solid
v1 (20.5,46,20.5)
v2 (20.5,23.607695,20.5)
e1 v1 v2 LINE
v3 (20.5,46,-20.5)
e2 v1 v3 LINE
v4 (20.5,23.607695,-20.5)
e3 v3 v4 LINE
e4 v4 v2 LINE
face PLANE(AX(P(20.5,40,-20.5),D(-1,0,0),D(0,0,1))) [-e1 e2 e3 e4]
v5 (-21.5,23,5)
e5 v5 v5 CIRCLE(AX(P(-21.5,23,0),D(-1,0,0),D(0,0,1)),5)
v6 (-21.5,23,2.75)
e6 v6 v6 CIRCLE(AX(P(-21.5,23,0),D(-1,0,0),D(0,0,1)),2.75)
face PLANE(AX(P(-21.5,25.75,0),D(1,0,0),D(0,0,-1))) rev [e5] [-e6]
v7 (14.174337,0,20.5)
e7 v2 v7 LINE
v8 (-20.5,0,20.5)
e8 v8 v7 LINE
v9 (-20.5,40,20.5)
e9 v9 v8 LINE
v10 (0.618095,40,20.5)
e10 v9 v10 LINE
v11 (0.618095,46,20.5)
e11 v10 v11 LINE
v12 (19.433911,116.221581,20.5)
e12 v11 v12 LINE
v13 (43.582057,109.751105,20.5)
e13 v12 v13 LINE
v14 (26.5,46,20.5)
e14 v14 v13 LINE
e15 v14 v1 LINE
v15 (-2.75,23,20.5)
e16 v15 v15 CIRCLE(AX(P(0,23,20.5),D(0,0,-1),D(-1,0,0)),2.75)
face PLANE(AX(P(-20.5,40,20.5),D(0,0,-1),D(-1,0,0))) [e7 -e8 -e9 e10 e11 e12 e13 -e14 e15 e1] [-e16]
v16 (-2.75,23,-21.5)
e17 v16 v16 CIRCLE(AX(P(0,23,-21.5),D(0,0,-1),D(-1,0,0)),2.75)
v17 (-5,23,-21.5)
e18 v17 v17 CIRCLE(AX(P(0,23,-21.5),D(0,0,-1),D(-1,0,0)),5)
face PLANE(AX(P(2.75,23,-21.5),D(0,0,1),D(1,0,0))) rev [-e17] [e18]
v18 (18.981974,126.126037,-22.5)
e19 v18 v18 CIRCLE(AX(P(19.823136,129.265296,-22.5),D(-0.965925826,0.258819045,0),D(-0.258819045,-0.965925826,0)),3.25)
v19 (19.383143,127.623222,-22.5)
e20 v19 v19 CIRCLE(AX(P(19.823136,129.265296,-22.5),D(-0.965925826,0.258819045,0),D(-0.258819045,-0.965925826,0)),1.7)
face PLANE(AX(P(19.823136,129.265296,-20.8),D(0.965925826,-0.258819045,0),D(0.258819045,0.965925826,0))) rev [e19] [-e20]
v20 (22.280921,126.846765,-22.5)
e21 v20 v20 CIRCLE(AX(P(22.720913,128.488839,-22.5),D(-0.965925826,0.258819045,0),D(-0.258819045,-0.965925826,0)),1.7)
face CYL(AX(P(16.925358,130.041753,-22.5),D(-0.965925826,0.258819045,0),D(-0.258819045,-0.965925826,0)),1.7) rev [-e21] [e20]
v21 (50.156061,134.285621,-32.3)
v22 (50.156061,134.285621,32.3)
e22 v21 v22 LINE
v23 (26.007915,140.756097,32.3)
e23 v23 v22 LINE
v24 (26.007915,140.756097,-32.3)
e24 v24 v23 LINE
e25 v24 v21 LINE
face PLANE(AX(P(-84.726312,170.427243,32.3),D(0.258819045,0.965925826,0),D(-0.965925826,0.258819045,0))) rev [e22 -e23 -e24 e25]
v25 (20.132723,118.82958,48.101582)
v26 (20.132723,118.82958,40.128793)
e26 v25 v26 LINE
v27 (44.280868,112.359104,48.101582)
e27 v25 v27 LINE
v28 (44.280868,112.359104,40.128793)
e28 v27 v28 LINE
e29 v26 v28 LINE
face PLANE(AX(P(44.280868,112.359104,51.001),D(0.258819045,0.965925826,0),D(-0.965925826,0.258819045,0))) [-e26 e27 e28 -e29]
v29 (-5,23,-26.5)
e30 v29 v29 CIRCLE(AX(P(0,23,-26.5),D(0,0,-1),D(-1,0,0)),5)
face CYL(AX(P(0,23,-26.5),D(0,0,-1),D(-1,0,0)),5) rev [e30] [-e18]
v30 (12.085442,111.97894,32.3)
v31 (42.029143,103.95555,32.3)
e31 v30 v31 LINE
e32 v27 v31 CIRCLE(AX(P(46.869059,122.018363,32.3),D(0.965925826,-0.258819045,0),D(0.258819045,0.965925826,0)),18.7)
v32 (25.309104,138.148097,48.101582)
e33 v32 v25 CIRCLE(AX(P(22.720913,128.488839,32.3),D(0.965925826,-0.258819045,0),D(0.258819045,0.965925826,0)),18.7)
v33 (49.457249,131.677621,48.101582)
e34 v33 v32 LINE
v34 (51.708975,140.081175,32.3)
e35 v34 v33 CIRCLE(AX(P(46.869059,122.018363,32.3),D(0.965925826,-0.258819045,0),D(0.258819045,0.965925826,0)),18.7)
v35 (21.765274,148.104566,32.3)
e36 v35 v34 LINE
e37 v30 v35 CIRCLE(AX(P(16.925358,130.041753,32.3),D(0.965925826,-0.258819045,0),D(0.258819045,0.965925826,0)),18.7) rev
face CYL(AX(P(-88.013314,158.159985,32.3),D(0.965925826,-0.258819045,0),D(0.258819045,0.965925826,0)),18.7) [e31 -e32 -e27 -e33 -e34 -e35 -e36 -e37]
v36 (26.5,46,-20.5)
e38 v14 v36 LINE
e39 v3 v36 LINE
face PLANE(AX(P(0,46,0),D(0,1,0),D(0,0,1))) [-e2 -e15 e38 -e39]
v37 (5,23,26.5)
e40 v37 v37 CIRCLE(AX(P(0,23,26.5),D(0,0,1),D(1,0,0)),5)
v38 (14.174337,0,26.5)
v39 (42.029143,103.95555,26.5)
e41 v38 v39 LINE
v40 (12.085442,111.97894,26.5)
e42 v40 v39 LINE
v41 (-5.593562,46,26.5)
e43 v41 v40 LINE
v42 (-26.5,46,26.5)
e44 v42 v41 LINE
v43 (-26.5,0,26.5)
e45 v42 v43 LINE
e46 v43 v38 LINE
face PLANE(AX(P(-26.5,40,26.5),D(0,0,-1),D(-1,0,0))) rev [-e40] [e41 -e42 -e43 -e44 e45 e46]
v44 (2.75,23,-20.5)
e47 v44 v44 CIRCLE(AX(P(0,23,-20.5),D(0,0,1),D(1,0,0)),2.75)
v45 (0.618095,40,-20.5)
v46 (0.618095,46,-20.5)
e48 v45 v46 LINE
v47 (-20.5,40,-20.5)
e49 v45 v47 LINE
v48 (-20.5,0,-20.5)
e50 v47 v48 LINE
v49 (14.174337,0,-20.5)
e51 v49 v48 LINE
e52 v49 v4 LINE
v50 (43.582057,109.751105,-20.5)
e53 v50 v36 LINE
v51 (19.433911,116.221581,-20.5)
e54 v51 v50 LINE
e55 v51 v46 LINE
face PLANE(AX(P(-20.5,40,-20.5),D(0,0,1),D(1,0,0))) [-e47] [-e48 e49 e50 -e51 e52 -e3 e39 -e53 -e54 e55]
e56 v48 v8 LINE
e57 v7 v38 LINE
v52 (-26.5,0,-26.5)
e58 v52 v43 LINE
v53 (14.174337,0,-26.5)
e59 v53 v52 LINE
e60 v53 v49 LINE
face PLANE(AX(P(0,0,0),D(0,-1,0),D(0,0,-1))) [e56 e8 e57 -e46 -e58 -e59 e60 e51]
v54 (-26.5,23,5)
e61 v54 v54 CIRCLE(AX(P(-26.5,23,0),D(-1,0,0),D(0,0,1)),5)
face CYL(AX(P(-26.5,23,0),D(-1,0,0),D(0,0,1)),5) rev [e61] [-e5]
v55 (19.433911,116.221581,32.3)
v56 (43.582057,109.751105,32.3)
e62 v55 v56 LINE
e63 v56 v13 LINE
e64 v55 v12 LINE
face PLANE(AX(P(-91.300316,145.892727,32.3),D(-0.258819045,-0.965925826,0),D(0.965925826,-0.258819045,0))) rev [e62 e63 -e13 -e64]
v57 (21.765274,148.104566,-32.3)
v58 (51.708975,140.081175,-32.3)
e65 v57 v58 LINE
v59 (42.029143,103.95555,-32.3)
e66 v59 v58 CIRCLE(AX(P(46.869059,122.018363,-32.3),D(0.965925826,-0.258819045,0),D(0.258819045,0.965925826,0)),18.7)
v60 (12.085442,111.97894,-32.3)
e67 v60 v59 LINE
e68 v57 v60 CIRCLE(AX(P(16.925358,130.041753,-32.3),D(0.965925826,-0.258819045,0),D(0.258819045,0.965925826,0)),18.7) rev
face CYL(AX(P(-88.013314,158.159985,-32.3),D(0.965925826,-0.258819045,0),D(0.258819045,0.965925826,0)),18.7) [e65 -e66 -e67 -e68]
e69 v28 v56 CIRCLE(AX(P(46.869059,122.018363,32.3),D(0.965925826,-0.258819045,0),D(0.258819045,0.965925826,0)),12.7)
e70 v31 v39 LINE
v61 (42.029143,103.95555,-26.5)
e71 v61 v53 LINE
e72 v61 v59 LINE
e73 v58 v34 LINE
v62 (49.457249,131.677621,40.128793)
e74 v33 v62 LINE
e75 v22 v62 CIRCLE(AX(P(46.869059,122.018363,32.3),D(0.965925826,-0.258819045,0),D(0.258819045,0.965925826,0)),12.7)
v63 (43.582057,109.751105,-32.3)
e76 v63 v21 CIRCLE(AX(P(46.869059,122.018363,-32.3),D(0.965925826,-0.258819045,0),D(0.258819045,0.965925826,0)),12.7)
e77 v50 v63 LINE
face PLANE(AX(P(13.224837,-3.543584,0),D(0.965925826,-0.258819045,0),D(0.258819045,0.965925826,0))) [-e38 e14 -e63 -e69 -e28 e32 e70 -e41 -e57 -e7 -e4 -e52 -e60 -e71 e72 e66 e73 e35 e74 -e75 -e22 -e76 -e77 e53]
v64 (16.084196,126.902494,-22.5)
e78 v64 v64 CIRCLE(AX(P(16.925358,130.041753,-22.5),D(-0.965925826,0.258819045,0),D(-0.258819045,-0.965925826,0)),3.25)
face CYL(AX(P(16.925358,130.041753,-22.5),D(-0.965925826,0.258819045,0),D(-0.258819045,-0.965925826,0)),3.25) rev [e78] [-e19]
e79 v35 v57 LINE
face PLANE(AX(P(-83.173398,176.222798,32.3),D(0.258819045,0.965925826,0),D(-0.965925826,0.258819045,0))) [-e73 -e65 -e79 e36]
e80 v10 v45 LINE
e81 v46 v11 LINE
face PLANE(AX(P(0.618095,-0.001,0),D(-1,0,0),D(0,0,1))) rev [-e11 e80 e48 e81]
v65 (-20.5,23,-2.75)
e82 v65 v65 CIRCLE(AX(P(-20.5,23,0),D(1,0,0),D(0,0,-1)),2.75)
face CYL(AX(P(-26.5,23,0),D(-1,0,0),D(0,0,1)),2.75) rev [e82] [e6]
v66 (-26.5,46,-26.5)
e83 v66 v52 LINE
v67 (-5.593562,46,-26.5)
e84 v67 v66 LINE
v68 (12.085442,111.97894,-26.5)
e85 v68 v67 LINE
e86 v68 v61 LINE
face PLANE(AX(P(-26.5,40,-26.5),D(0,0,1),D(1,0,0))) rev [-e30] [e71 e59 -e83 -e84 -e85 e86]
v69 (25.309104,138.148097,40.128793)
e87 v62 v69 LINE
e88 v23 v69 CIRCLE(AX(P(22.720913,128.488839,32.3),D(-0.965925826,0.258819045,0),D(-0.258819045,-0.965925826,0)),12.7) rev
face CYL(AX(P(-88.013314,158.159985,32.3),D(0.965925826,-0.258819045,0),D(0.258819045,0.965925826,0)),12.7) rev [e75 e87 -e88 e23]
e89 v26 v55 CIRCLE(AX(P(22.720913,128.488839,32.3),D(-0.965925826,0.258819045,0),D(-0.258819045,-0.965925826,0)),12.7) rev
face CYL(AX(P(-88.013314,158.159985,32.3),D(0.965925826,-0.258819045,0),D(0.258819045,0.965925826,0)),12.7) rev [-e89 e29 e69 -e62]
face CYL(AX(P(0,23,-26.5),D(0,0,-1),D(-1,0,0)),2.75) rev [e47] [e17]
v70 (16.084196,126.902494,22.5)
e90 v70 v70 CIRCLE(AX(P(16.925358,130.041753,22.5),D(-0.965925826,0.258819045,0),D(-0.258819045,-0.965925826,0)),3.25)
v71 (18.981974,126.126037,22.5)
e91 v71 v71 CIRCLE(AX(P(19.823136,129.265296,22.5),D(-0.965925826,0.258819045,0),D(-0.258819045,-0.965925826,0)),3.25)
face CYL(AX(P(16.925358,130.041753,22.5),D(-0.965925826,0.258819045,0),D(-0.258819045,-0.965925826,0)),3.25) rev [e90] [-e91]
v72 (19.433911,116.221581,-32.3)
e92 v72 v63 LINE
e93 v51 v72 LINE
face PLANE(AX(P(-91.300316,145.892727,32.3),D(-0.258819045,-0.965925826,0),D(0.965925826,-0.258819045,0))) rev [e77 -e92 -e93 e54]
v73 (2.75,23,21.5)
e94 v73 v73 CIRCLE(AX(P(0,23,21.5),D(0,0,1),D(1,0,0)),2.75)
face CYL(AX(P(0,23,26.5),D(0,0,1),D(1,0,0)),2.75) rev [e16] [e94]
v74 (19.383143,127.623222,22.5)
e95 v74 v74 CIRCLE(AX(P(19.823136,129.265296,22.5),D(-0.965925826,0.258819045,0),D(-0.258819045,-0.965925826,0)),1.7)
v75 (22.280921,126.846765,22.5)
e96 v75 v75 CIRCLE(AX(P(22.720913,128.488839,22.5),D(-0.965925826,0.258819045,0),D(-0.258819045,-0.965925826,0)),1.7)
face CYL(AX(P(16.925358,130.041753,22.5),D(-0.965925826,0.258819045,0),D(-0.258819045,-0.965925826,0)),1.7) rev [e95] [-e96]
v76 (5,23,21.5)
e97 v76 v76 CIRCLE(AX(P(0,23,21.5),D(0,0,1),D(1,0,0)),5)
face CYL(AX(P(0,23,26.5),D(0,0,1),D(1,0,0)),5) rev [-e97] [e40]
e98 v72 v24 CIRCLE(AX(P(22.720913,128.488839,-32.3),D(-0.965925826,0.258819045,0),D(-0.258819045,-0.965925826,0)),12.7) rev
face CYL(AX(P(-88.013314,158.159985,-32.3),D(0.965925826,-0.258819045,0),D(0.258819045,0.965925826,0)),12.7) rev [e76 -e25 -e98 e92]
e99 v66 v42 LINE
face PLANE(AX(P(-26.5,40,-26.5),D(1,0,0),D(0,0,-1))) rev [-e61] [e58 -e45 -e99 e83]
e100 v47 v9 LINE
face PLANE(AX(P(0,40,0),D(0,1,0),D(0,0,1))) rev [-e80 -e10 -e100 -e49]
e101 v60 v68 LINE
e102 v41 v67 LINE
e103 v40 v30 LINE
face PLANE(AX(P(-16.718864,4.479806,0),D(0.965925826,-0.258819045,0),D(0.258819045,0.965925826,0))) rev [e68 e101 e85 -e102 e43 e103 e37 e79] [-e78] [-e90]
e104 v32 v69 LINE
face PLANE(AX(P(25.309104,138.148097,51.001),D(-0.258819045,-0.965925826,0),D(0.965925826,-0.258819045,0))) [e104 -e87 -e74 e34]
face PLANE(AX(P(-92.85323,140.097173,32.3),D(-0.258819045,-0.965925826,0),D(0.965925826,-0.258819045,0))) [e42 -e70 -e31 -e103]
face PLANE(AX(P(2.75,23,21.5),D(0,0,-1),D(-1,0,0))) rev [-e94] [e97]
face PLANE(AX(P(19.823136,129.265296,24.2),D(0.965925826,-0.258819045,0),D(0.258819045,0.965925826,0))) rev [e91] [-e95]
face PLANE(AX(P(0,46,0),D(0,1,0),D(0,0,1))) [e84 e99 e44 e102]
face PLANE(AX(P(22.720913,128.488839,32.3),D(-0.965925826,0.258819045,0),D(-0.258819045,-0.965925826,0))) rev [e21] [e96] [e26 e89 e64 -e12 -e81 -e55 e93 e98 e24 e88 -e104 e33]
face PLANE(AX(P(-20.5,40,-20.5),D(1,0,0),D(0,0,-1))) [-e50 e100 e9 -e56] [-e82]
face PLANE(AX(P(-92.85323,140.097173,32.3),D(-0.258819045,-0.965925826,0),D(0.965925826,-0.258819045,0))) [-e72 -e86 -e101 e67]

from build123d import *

# Parameters (mm, degrees)
SKETCH1_W                                = 53
SKETCH1_H                                = 53
SKETCH1_W_2                              = 41
SKETCH1_H_2                              = 41
BOSS_EXTRUDE1_DEPTH                      = 40
SKETCH2_W                                = 53
SKETCH2_H                                = 53
BOSS_EXTRUDE2_DEPTH                      = 6
SKETCH3_W                                = 53
SKETCH3_H                                = 80
SKETCH3_W_2                              = 41
SKETCH3_H_2                              = 68
BOSS_EXTRUDE3_DEPTH                      = 31
BOSS_EXTRUDE4_DEPTH                      = 31
BOSS_EXTRUDE5_START                      = -6
BOSS_EXTRUDE5_DEPTH                      = 6
SKETCH6_W                                = 41
SKETCH6_H                                = 12
CUT_EXTRUDE1_DEPTH                       = 25
CBORE_FOR_M3_SHCS2_D                     = 3.4
CBORE_FOR_M3_SHCS2_CBORE_D               = 6.5
CBORE_FOR_M3_SHCS2_CBORE_DEPTH           = 3
CUT_EXTRUDE2_REACH                       = 166.954
SKETCH14_W                               = 41
SKETCH14_H                               = 41
CUT_EXTRUDE3_DEPTH                       = 40
CUT_EXTRUDE4_REACH                       = 127.3
SKETCH15_W                               = 19.88190451
SKETCH15_H                               = 41
CBORE_FOR_M5_SHCS1_D                     = 5.5
CBORE_FOR_M5_SHCS1_DEPTH                 = 6
CBORE_FOR_M5_SHCS1_CBORE_D               = 10
CBORE_FOR_M5_SHCS1_CBORE_DEPTH           = 5
CBORE_FOR_M5_SHCS1_ON_FACE_2_D           = 5.5
CBORE_FOR_M5_SHCS1_ON_FACE_2_DEPTH       = 6
CBORE_FOR_M5_SHCS1_ON_FACE_2_CBORE_D     = 10
CBORE_FOR_M5_SHCS1_ON_FACE_2_CBORE_DEPTH = 5
CBORE_FOR_M5_SHCS1_ON_FACE_3_D           = 5.5
CBORE_FOR_M5_SHCS1_ON_FACE_3_DEPTH       = 6
CBORE_FOR_M5_SHCS1_ON_FACE_3_CBORE_D     = 10
CBORE_FOR_M5_SHCS1_ON_FACE_3_CBORE_DEPTH = 5
CUT_EXTRUDE5_START                       = -26.5
CUT_EXTRUDE5_DEPTH                       = 53


with BuildPart() as part:
    # Sketch1 → Boss-Extrude1 (new body)
    with BuildSketch(Plane(origin=(0, 0, 0), x_dir=(1, 0, 0), z_dir=(0, 1, 0))):
        Rectangle(SKETCH1_W, SKETCH1_H)
        Rectangle(SKETCH1_W_2, SKETCH1_H_2, mode=Mode.SUBTRACT)
    extrude(amount=BOSS_EXTRUDE1_DEPTH)

    # Sketch2 → Boss-Extrude2 (add)
    with BuildSketch(Plane(origin=(0, 40, 0), x_dir=(1, 0, 0), z_dir=(0, 1, 0))):
        Rectangle(SKETCH2_W, SKETCH2_H)
    extrude(amount=BOSS_EXTRUDE2_DEPTH)

    # Sketch3 → Boss-Extrude3 (add)
    with BuildSketch(Plane(origin=(13.2248366, -3.543584287, 0), x_dir=(0, 0, -1), z_dir=(-0.9659258262890681, 0.25881904510252135, 0))):
        with Locations((0, -71.291292705)):
            Rectangle(SKETCH3_W, SKETCH3_H)
        with Locations((0, -71.291292705)):
            Rectangle(SKETCH3_W_2, SKETCH3_H_2, mode=Mode.SUBTRACT)
    extrude(amount=BOSS_EXTRUDE3_DEPTH)

    # Sketch4 → Boss-Extrude4 (add)
    with BuildSketch(Plane(origin=(13.2248366, -3.543584287, 0), x_dir=(0, 0, -1), z_dir=(0.9659258262890681, -0.25881904510252135, 0))):
        with BuildLine():
            Line((-32.3, 148.691292705), (32.3, 148.691292705))
            ThreePointArc((32.3, 148.691292705), (51, 129.991292705), (32.3, 111.291292705))
            Line((32.3, 111.291292705), (-32.3, 111.291292705))
            ThreePointArc((-32.3, 111.291292705), (-51, 129.991292705), (-32.3, 148.691292705))
        make_face()
        with BuildLine():
            Line((-32.3, 142.691292705), (32.3, 142.691292705))
            ThreePointArc((32.3, 142.691292705), (45, 129.991292705), (32.3, 117.291292705))
            Line((32.3, 117.291292705), (-32.3, 117.291292705))
            ThreePointArc((-32.3, 117.291292705), (-45, 129.991292705), (-32.3, 142.691292705))
        make_face(mode=Mode.SUBTRACT)
    extrude(amount=-BOSS_EXTRUDE4_DEPTH)

    # Sketch5 → Boss-Extrude5 (add)
    with BuildSketch(Plane(origin=(-16.718864015, 4.479806111, 0), x_dir=(0, 0, 1), z_dir=(-0.9659258262890681, 0.25881904510252135, 0)).offset(BOSS_EXTRUDE5_START)):
        with BuildLine():
            Line((-20.5, 42.984867739), (20.5, 42.984867739))
            Line((20.5, 42.984867739), (26.5, 42.984867739))
            Line((26.5, 42.984867739), (26.5, 111.291292705))
            Line((26.5, 111.291292705), (32.3, 111.291292705))
            ThreePointArc((32.3, 111.291292705), (51, 129.991292705), (32.3, 148.691292705))
            Line((32.3, 148.691292705), (-32.3, 148.691292705))
            ThreePointArc((-32.3, 148.691292705), (-51, 129.991292705), (-32.3, 111.291292705))
            Line((-32.3, 111.291292705), (-26.5, 111.291292705))
            Line((-26.5, 111.291292705), (-26.5, 42.984867739))
            Line((-26.5, 42.984867739), (-20.5, 42.984867739))
        make_face()
    extrude(amount=BOSS_EXTRUDE5_DEPTH)

    # Sketch6 → Cut-Extrude1 (cut)
    with BuildSketch(Plane(origin=(13.2248366, -3.543584287, 0), x_dir=(0, 0, -1), z_dir=(0.9659258262890681, -0.25881904510252135, 0))):
        with Locations((0, 111.291292705)):
            Rectangle(SKETCH6_W, SKETCH6_H)
    extrude(amount=-CUT_EXTRUDE1_DEPTH, mode=Mode.SUBTRACT)

    # CBORE for M3 SHCS2 (through all)
    with Locations(Plane(origin=(-16.718864015, 4.479806111, 0), x_dir=(0, 0, 1), z_dir=(-0.9659258262890681, 0.25881904510252135, 0))):
        with Locations((22.5, 129.991292705), (-22.5, 129.991292705)):
            CounterBoreHole(CBORE_FOR_M3_SHCS2_D / 2, CBORE_FOR_M3_SHCS2_CBORE_D / 2, CBORE_FOR_M3_SHCS2_CBORE_DEPTH)

    # Sketch13 → Cut-Extrude2 (cut, up to next)
    with BuildSketch(Plane.XY, mode=Mode.PRIVATE) as cut_extrude2_sk1:
        Polygon((49.457249301, 131.677620792), (44.280868399, 112.359104266), (20.132722741, 118.829580394), (25.309103643, 138.148096919), align=None)
    cut_extrude2_tool1 = extrude(cut_extrude2_sk1.sketch, amount=CUT_EXTRUDE2_REACH, mode=Mode.PRIVATE) & part.part
    add(cut_extrude2_tool1.solids().sort_by_distance((34.794986, 125.253601, 0))[0], mode=Mode.SUBTRACT)

    # Sketch14 → Cut-Extrude3 (cut)
    with BuildSketch(Plane.XZ):
        Rectangle(SKETCH14_W, SKETCH14_H)
    extrude(amount=-CUT_EXTRUDE3_DEPTH, mode=Mode.SUBTRACT)

    # Sketch15 → Cut-Extrude4 (cut, up to next)
    with BuildSketch(Plane(origin=(0, 46, 0), x_dir=(1, 0, 0), z_dir=(0, 1, 0)), mode=Mode.PRIVATE) as cut_extrude4_sk1:
        with Locations((10.559047745, 0)):
            Rectangle(SKETCH15_W, SKETCH15_H)
    cut_extrude4_tool1 = extrude(cut_extrude4_sk1.sketch, amount=-CUT_EXTRUDE4_REACH, mode=Mode.PRIVATE) & part.part
    add(cut_extrude4_tool1.solids().sort_by_distance((10.559048, 46, 0))[0], mode=Mode.SUBTRACT)

    # CBORE for M5 SHCS1
    with Locations(Plane(origin=(0, 23, -26.5), x_dir=(-1, 0, 0), z_dir=(0, 0, -1))):
        with Locations((0, 0)):
            CounterBoreHole(CBORE_FOR_M5_SHCS1_D / 2, CBORE_FOR_M5_SHCS1_CBORE_D / 2, CBORE_FOR_M5_SHCS1_CBORE_DEPTH, depth=CBORE_FOR_M5_SHCS1_DEPTH)

    # CBORE for M5 SHCS1 on face 2
    with Locations(Plane(origin=(-26.5, 23, 0), x_dir=(0, 0, -1), z_dir=(-1, 0, 0))):
        with Locations((0, 0)):
            CounterBoreHole(CBORE_FOR_M5_SHCS1_ON_FACE_2_D / 2, CBORE_FOR_M5_SHCS1_ON_FACE_2_CBORE_D / 2, CBORE_FOR_M5_SHCS1_ON_FACE_2_CBORE_DEPTH, depth=CBORE_FOR_M5_SHCS1_ON_FACE_2_DEPTH)

    # CBORE for M5 SHCS1 on face 3
    with Locations(Plane(origin=(0, 23, 26.5), x_dir=(1, 0, 0), z_dir=(0, 0, 1))):
        with Locations((0, 0)):
            CounterBoreHole(CBORE_FOR_M5_SHCS1_ON_FACE_3_D / 2, CBORE_FOR_M5_SHCS1_ON_FACE_3_CBORE_D / 2, CBORE_FOR_M5_SHCS1_ON_FACE_3_CBORE_DEPTH, depth=CBORE_FOR_M5_SHCS1_ON_FACE_3_DEPTH)

    # Cut-Extrude5: read off the stored shape, not the designer's step
    # Cut-Extrude5 outline → Cut-Extrude5 (cut)
    with BuildSketch(Plane.XY.offset(CUT_EXTRUDE5_START)):
        Polygon((14.174337148, 0), (26.5, 0), (26.5, 46), align=None)
    extrude(amount=CUT_EXTRUDE5_DEPTH, mode=Mode.SUBTRACT)


solid = part.part
